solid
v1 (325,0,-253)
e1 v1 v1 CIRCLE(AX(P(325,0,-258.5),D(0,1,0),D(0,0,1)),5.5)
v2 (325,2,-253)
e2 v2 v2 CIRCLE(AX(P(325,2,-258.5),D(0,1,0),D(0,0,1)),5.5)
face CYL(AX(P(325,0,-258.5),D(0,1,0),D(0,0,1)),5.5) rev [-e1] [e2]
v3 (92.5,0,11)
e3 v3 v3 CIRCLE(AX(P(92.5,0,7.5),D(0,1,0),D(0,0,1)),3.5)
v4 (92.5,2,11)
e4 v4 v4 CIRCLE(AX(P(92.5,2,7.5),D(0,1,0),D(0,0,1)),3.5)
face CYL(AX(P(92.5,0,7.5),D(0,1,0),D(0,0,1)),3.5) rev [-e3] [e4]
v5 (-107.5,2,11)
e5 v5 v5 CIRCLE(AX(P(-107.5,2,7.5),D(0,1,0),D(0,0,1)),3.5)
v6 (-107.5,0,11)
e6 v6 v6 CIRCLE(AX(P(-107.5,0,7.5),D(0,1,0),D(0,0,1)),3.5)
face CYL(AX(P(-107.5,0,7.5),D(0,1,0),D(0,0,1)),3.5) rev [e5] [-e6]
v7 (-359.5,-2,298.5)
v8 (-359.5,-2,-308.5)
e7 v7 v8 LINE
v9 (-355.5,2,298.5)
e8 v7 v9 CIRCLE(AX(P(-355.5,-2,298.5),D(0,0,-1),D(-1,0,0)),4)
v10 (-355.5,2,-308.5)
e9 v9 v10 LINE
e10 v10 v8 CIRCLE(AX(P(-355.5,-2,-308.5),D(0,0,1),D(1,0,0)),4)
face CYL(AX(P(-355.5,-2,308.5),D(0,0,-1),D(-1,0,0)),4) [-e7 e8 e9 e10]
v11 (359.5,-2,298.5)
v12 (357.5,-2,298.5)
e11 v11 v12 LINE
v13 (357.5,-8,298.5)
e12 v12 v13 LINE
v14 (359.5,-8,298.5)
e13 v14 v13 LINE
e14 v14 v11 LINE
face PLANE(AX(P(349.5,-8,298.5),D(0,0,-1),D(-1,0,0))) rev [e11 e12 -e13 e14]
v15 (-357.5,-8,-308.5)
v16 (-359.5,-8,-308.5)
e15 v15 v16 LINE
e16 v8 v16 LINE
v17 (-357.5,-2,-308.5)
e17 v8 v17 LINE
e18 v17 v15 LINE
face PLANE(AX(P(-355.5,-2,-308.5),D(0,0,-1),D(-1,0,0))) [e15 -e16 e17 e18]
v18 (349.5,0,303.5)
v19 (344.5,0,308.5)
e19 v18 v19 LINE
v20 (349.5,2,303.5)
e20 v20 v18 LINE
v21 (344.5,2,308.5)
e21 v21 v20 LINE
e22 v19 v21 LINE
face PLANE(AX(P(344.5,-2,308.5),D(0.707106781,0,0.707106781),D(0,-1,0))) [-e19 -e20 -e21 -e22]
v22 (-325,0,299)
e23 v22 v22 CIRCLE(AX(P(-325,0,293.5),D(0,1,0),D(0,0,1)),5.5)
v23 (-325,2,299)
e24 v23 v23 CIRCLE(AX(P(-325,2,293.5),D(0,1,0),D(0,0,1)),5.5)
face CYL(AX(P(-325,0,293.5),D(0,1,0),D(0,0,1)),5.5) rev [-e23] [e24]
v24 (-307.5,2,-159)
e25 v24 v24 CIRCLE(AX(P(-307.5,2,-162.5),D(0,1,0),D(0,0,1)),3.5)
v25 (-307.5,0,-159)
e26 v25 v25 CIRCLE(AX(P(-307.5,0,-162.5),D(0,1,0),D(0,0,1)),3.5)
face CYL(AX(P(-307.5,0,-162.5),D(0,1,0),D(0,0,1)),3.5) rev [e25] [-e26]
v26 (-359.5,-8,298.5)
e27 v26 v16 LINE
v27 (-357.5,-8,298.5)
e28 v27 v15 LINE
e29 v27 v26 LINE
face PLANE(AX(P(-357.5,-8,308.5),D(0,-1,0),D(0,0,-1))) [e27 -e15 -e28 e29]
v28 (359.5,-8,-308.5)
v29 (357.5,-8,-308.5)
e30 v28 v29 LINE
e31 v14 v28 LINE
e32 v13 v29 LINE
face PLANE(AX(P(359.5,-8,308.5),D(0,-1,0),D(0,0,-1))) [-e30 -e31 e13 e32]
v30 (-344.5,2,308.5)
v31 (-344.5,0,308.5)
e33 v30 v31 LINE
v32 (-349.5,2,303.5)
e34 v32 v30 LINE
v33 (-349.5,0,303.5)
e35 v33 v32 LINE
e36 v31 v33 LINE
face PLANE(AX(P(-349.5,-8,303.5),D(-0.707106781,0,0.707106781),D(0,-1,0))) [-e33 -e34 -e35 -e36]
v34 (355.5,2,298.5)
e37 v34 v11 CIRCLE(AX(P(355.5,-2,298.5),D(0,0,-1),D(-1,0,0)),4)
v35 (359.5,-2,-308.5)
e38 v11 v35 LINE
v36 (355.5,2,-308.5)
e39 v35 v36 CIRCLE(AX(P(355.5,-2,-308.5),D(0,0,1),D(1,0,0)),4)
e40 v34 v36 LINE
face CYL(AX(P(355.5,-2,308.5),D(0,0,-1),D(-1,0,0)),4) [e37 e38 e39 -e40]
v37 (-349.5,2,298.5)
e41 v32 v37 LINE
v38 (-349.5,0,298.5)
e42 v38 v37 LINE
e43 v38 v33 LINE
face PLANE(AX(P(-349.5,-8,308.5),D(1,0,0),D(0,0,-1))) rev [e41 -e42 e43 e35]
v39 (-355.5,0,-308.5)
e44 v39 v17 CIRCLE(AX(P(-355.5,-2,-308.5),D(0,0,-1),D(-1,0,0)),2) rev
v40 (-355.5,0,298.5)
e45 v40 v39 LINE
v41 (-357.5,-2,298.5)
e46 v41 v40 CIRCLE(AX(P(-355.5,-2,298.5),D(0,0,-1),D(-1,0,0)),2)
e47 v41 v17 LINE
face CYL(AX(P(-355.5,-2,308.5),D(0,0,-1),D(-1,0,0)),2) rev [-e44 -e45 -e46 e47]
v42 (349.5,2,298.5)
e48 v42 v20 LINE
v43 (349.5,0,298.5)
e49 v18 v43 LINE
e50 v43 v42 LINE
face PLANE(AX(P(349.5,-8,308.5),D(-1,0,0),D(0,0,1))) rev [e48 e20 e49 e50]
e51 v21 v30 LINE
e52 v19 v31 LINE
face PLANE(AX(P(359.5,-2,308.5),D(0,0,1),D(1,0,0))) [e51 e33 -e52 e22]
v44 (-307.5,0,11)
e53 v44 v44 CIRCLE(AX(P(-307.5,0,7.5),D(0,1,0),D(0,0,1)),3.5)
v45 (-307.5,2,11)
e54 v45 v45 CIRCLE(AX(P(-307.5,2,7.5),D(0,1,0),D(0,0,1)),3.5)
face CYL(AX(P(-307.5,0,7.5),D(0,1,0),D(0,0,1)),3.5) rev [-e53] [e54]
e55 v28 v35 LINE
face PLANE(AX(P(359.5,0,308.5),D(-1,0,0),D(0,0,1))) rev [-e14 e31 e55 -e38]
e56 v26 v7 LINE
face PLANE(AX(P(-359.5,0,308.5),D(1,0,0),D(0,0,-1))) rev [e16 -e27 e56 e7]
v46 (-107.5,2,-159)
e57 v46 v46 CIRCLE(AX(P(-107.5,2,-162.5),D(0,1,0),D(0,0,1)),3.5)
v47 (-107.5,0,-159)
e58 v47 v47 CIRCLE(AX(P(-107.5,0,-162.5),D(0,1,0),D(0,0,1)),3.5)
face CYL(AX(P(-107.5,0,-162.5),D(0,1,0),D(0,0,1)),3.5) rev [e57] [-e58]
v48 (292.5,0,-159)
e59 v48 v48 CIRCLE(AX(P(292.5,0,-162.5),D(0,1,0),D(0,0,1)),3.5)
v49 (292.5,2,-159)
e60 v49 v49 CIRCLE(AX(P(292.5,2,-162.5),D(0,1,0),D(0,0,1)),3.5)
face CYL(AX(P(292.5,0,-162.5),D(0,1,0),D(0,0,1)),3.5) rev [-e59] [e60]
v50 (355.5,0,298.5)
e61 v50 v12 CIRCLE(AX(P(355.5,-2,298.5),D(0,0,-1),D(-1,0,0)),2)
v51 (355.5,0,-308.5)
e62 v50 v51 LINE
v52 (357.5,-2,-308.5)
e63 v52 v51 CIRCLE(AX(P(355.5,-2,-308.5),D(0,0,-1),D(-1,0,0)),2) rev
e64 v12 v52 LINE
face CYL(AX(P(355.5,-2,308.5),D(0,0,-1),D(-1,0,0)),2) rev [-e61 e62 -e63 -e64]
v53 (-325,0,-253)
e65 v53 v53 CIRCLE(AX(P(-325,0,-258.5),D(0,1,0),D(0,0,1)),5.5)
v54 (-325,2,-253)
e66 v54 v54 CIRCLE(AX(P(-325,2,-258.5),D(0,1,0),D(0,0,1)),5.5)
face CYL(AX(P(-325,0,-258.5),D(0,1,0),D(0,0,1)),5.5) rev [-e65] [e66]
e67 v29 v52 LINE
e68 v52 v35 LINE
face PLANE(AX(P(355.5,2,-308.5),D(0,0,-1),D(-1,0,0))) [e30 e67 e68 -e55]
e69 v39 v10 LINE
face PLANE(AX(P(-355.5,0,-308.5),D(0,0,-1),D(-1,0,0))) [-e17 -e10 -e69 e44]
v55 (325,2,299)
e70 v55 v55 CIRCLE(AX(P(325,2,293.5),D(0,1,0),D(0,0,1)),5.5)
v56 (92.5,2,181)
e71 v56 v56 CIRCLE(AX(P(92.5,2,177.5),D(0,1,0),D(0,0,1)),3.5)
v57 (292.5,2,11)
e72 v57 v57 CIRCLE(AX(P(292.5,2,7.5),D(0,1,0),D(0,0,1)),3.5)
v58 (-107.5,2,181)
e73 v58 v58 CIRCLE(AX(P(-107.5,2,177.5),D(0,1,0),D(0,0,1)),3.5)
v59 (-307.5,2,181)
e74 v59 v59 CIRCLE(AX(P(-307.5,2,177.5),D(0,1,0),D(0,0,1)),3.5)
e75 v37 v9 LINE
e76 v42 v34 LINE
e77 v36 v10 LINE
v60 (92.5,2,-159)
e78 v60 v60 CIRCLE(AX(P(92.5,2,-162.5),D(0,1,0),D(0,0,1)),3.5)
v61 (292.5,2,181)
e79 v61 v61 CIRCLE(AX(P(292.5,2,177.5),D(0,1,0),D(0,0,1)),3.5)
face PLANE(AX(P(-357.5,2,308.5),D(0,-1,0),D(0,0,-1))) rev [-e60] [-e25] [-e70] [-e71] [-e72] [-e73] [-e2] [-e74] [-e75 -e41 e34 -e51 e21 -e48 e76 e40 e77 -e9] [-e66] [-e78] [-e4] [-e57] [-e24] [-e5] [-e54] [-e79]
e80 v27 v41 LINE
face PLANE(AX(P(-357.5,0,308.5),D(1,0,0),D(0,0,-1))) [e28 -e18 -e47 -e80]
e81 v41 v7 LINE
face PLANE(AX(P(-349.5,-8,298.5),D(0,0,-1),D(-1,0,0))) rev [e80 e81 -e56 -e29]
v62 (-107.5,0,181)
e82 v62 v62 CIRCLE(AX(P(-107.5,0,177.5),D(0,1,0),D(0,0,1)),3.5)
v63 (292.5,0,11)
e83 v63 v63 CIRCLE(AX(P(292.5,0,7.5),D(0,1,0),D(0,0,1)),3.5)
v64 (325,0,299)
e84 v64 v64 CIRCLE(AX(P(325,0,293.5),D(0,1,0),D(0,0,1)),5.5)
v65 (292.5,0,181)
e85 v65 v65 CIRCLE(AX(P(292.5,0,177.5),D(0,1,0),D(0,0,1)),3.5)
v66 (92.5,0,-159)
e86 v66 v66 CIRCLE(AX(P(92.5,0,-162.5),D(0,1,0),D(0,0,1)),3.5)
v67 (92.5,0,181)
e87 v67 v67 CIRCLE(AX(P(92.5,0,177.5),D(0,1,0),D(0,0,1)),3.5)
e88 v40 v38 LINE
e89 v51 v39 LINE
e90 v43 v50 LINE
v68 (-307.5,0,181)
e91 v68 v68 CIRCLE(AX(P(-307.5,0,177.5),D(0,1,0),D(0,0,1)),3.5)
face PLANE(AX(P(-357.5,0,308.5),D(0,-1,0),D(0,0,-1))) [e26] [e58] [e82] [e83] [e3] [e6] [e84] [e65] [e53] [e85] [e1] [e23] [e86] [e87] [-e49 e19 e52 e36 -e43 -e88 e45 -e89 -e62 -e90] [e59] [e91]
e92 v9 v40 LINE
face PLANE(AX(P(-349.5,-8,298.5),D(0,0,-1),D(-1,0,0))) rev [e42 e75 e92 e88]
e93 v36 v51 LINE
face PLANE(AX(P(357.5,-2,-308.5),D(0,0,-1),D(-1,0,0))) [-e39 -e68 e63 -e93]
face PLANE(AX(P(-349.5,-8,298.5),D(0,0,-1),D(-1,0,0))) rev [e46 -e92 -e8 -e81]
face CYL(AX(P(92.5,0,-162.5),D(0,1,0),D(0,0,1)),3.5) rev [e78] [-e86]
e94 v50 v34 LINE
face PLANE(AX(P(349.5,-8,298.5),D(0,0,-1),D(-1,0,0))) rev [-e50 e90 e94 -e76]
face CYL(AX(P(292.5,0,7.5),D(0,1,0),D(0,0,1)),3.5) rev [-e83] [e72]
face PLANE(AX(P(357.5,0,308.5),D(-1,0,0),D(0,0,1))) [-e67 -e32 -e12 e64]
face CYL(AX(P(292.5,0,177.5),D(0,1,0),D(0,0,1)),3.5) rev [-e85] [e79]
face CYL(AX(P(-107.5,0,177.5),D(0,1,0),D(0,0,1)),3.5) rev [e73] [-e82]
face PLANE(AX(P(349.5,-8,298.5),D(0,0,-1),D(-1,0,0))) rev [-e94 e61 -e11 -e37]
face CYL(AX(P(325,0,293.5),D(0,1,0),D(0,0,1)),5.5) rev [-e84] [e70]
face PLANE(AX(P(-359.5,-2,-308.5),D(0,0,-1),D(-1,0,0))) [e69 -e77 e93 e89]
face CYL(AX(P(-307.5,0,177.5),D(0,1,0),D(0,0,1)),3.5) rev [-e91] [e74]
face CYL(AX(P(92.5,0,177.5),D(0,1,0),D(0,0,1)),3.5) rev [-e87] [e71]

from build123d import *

# Parameters (mm, degrees)
SM_BASE_FLANGE_1_DEPTH = 308.5
SKETCH_6_W             = 10
SKETCH_6_H             = 10
CUT_EXTRUDE_1_DEPTH    = 474.827500257
OTHER_1_DEPTH          = 2
SKETCH_7_R             = 5.5
CUT_EXTRUDE_2_DEPTH    = 10
SKETCH_8_R             = 3.5
CUT_EXTRUDE_3_DEPTH    = 10


# Read off the part's stored shape, not the designer's step: Затупленный угол1
# Sheet-metal steps are written as plain solids
with BuildPart() as part:
    # Sketch 1 → Базовая кромка1 (new, symmetric)
    with BuildSketch(Plane.XY):
        with BuildLine():
            Line((-357.5, -8), (-357.5, -2))
            ThreePointArc((-357.5, -2), (-356.914213562, -0.585786438), (-355.5, 0))
            Line((-355.5, 0), (355.5, 0))
            ThreePointArc((355.5, 0), (356.914213562, -0.585786438), (357.5, -2))
            Line((357.5, -2), (357.5, -8))
            Line((357.5, -8), (359.5, -8))
            Line((359.5, -8), (359.5, -2))
            ThreePointArc((359.5, -2), (358.328427125, 0.828427125), (355.5, 2))
            Line((355.5, 2), (-355.5, 2))
            ThreePointArc((-355.5, 2), (-358.328427125, 0.828427125), (-359.5, -2))
            Line((-359.5, -2), (-359.5, -8))
            Line((-359.5, -8), (-357.5, -8))
        make_face()
    extrude(amount=SM_BASE_FLANGE_1_DEPTH, both=True)

    # Эскиз6 → Вырез-Вытянуть1 (cut, through all)
    with BuildSketch(Plane(origin=(0, 2, 0), x_dir=(1, 0, 0), z_dir=(0, 1, 0))):
        with Locations((-354.5, -303.5)):
            Rectangle(SKETCH_6_W, SKETCH_6_H)
        with Locations((354.5, -303.5)):
            Rectangle(SKETCH_6_W, SKETCH_6_H)
    extrude(amount=-CUT_EXTRUDE_1_DEPTH, mode=Mode.SUBTRACT)

    # Other 1 outline → Other 1 (cut)
    with BuildSketch(Plane(origin=(0, 0, 0), x_dir=(1, 0, 0), z_dir=(0, 1, 0))):
        Polygon((-349.5, -308.5), (-344.5, -308.5), (-349.5, -303.5), align=None)
        Polygon((349.5, -303.5), (344.5, -308.5), (349.5, -308.5), align=None)
    extrude(amount=OTHER_1_DEPTH, mode=Mode.SUBTRACT)

    # Эскиз7 → Вырез-Вытянуть2 (cut)
    with BuildSketch(Plane(origin=(0, 2, 0), x_dir=(1, 0, 0), z_dir=(0, 1, 0))):
        with Locations(Location((325, -293.5, 0), (0, 0, 270))):
            Circle(SKETCH_7_R)
        with Locations(Location((-325, -293.5, 0), (0, 0, 270))):
            Circle(SKETCH_7_R)
        with Locations(Location((-325, 258.5, 0), (0, 0, 270))):
            Circle(SKETCH_7_R)
        with Locations(Location((325, 258.5, 0), (0, 0, 270))):
            Circle(SKETCH_7_R)
    extrude(amount=-CUT_EXTRUDE_2_DEPTH, mode=Mode.SUBTRACT)

    # Эскиз8 → Вырез-Вытянуть3 (cut)
    with BuildSketch(Plane(origin=(0, 2, 0), x_dir=(1, 0, 0), z_dir=(0, 1, 0))):
        with Locations(Location((292.5, 162.5, 0), (0, 0, 270))):
            Circle(SKETCH_8_R)
        with Locations(Location((92.5, 162.5, 0), (0, 0, 270))):
            Circle(SKETCH_8_R)
        with Locations(Location((-107.5, 162.5, 0), (0, 0, 270))):
            Circle(SKETCH_8_R)
        with Locations(Location((-307.5, 162.5, 0), (0, 0, 270))):
            Circle(SKETCH_8_R)
        with Locations(Location((92.5, -7.5, 0), (0, 0, 270))):
            Circle(SKETCH_8_R)
        with Locations(Location((-107.5, -7.5, 0), (0, 0, 270))):
            Circle(SKETCH_8_R)
        with Locations(Location((-307.5, -7.5, 0), (0, 0, 270))):
            Circle(SKETCH_8_R)
        with Locations(Location((92.5, -177.5, 0), (0, 0, 270))):
            Circle(SKETCH_8_R)
        with Locations(Location((-107.5, -177.5, 0), (0, 0, 270))):
            Circle(SKETCH_8_R)
        with Locations(Location((-307.5, -177.5, 0), (0, 0, 270))):
            Circle(SKETCH_8_R)
        with Locations(Location((292.5, -7.5, 0), (0, 0, 270))):
            Circle(SKETCH_8_R)
        with Locations(Location((292.5, -177.5, 0), (0, 0, 270))):
            Circle(SKETCH_8_R)
    extrude(amount=-CUT_EXTRUDE_3_DEPTH, mode=Mode.SUBTRACT)


solid = part.part
